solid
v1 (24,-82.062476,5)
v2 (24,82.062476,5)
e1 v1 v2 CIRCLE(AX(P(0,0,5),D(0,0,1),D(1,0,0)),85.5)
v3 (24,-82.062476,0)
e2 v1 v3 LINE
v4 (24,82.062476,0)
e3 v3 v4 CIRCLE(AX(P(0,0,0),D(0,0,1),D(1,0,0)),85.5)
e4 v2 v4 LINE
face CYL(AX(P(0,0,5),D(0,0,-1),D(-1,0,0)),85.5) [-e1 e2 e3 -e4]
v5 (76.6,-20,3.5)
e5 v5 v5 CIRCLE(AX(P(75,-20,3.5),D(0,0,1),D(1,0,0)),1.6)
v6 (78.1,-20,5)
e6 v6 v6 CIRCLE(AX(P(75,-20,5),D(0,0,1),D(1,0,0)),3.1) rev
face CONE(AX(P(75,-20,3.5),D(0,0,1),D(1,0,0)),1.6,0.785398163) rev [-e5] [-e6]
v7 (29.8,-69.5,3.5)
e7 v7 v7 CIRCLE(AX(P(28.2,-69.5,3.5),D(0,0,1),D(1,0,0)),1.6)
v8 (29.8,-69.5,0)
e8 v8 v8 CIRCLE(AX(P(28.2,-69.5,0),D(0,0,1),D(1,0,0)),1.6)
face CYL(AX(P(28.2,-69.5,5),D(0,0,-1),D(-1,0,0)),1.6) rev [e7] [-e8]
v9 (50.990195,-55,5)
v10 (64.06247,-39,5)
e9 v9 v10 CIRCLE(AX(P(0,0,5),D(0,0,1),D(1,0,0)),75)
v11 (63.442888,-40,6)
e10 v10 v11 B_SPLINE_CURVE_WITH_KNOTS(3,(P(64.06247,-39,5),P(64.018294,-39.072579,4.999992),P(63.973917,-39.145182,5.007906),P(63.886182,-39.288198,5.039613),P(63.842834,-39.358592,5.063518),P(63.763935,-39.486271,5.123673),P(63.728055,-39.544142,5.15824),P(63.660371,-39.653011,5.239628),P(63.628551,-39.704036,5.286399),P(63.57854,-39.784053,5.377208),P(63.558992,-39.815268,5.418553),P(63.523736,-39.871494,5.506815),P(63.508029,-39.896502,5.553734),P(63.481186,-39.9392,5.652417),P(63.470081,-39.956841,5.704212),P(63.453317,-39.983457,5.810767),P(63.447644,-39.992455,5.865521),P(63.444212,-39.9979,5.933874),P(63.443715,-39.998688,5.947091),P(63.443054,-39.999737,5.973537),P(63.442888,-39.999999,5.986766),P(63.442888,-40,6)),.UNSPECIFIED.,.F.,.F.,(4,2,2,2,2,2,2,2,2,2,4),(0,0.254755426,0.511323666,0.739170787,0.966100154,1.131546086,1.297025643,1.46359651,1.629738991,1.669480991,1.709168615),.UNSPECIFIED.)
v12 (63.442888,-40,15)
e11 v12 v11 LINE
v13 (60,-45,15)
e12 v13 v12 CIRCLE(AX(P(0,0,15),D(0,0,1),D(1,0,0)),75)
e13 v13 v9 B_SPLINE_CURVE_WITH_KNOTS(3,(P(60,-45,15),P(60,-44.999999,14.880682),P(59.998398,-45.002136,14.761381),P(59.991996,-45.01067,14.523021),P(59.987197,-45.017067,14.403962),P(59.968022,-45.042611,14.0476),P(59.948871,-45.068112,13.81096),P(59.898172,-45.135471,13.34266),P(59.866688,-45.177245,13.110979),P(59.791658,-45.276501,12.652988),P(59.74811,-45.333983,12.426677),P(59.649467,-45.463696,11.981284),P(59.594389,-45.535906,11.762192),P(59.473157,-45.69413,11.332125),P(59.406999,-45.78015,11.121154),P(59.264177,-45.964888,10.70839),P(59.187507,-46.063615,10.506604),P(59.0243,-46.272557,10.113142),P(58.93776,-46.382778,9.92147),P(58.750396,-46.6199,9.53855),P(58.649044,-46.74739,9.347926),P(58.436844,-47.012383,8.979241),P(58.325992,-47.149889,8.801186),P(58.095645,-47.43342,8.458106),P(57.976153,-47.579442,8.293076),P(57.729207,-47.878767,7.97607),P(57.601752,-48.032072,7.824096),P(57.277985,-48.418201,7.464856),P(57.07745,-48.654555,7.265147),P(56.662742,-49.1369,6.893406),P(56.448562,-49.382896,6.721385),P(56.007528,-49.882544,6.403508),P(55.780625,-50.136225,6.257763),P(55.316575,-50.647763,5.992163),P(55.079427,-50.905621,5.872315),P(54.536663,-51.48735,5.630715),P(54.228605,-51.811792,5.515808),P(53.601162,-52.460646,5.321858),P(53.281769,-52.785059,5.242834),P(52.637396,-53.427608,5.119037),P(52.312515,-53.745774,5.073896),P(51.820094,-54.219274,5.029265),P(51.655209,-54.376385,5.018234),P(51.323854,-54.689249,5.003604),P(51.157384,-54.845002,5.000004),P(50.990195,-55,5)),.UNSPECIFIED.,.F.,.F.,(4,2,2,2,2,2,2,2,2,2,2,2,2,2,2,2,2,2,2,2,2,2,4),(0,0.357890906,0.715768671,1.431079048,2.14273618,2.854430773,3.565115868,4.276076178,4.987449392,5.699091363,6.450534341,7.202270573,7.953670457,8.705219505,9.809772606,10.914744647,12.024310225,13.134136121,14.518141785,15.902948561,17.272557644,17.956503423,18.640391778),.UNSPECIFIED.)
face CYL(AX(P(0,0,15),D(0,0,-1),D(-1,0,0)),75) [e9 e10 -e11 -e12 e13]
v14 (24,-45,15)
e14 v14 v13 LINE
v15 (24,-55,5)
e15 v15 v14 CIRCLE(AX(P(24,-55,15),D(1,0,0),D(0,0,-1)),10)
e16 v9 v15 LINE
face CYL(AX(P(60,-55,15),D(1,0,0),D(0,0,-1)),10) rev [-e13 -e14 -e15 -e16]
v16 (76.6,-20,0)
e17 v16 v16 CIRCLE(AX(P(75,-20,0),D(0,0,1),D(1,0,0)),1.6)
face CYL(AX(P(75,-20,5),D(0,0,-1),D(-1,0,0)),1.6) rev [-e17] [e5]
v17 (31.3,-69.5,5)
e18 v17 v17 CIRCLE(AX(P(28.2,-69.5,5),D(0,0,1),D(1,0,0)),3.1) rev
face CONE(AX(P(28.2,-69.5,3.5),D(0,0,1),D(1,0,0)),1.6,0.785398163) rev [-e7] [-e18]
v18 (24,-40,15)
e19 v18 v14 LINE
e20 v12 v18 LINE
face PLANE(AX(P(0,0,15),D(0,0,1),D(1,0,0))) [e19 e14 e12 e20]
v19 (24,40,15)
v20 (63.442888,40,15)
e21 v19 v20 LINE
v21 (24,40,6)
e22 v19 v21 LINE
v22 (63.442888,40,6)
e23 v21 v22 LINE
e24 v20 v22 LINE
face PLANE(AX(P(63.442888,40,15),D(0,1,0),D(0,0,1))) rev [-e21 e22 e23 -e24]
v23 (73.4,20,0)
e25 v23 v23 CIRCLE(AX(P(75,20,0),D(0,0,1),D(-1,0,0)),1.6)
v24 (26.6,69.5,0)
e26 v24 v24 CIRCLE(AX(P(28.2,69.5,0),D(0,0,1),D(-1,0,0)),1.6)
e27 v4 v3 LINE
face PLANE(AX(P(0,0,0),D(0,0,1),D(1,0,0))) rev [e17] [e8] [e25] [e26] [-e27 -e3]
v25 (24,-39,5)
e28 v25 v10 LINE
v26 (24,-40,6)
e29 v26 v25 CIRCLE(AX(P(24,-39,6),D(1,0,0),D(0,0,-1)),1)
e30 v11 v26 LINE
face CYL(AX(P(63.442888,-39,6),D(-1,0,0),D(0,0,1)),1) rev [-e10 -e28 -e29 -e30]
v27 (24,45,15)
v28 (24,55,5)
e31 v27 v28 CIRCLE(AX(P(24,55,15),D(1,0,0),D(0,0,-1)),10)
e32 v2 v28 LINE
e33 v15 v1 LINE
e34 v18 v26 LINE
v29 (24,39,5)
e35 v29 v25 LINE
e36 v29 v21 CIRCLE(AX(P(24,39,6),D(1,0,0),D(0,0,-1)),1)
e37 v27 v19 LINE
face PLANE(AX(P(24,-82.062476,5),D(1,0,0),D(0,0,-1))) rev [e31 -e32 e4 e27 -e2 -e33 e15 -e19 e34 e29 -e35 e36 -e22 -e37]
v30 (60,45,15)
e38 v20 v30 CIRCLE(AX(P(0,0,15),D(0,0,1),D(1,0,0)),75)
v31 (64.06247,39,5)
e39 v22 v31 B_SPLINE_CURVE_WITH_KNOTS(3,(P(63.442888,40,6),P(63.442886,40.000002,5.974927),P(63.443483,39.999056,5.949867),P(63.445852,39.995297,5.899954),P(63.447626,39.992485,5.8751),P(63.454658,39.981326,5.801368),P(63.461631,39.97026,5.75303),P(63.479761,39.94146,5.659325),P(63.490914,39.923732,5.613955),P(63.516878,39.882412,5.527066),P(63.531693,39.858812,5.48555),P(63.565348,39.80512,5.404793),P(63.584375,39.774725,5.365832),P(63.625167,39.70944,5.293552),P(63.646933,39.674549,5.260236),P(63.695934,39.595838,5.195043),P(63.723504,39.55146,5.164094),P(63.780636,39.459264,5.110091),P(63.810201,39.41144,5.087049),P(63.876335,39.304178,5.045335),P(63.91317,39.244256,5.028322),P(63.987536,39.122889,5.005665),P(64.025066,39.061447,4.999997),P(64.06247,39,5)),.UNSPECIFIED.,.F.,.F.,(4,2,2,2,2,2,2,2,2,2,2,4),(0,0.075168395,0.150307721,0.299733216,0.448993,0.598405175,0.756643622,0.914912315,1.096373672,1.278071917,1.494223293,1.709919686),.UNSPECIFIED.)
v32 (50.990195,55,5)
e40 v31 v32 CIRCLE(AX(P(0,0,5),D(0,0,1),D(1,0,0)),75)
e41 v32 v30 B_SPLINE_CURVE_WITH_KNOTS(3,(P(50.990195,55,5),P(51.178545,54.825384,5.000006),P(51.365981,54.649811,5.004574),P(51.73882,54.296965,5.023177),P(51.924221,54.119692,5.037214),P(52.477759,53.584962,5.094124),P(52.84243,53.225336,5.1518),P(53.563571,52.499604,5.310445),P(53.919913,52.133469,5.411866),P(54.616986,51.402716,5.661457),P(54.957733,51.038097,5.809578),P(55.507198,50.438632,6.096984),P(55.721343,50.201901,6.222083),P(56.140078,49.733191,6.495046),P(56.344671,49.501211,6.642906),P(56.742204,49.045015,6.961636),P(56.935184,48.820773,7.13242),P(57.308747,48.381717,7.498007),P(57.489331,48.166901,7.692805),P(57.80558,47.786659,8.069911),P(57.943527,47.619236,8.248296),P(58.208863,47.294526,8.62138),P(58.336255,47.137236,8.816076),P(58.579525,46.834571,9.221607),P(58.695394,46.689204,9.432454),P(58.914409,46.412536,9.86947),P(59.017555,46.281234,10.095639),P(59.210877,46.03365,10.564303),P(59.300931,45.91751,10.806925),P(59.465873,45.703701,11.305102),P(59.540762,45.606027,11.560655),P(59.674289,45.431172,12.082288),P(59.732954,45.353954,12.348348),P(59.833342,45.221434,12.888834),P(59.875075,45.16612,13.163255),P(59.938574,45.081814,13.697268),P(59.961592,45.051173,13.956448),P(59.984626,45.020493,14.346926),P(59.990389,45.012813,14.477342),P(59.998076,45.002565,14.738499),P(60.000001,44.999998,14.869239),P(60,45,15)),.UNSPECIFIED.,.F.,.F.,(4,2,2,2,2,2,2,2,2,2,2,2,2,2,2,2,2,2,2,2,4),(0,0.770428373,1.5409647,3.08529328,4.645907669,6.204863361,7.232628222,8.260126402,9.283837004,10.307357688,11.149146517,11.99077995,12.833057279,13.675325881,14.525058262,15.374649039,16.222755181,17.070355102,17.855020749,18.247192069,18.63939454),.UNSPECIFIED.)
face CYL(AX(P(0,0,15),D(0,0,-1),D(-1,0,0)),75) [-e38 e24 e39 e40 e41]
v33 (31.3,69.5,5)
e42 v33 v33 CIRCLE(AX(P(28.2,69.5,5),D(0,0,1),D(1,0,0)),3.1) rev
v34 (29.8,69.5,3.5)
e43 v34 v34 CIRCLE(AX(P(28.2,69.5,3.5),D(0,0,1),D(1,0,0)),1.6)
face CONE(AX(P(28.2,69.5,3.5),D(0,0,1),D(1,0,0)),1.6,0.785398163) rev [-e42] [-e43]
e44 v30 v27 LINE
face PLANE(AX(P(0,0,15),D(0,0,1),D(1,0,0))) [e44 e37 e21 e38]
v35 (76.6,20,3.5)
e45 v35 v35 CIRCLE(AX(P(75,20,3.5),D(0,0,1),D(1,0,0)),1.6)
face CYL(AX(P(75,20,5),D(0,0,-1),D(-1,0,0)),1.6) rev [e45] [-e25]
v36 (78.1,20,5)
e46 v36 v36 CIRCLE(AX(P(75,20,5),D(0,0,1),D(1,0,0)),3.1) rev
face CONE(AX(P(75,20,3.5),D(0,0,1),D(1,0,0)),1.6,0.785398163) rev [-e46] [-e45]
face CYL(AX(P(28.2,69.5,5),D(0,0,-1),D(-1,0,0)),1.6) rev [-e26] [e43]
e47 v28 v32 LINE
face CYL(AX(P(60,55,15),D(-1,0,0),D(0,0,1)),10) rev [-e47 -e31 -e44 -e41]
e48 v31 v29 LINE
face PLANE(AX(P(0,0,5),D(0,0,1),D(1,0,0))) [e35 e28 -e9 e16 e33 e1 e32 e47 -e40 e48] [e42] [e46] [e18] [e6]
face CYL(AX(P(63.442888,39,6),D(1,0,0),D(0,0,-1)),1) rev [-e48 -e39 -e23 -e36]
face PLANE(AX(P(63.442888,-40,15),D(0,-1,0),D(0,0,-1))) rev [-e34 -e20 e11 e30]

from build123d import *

# Parameters (mm, degrees)
SKETCH1_R           = 1.6
BOSS_EXTRUDE2_DEPTH = 5
BOSS_EXTRUDE3_DEPTH = 10
CHAMFER1_SIZE       = 1.5
FILLET1_R           = 10
FILLET2_R           = 1


with BuildPart() as part:
    # Sketch1 → Boss-Extrude2 (new body)
    with BuildSketch(Plane(origin=(0, 0, 0), x_dir=(0, 1, 0), z_dir=(0, 0, 1))):
        with BuildLine():
            Line((-82.0624762, -24), (82.0624762, -24))
            ThreePointArc((82.0624762, -24), (0, -85.5), (-82.0624762, -24))
        make_face()
        with Locations(Location((-20, -75, 0), (0, 0, 270))):
            Circle(SKETCH1_R, mode=Mode.SUBTRACT)
        with Locations(Location((20, -75, 0), (0, 0, 90))):
            Circle(SKETCH1_R, mode=Mode.SUBTRACT)
        with Locations(Location((-69.5, -28.2, 0), (0, 0, 270))):
            Circle(SKETCH1_R, mode=Mode.SUBTRACT)
        with Locations(Location((69.5, -28.2, 0), (0, 0, 90))):
            Circle(SKETCH1_R, mode=Mode.SUBTRACT)
    extrude(amount=BOSS_EXTRUDE2_DEPTH)

    # Sketch2 → Boss-Extrude3 (add)
    with BuildSketch(Plane.XY.offset(5)):
        with BuildLine():
            Line((60, 45), (24, 45))
            Line((24, 45), (24, 40))
            Line((24, 40), (63.442887702, 40))
            ThreePointArc((63.442887702, 40), (61.772053803, 42.534848876), (60, 45))
        make_face()
        with BuildLine():
            Line((24, -45), (24, -40))
            Line((24, -40), (63.442887702, -40))
            ThreePointArc((63.442887702, -40), (61.772053803, -42.534848876), (60, -45))
            Line((60, -45), (24, -45))
        make_face()
    extrude(amount=BOSS_EXTRUDE3_DEPTH)

    # Chamfer1
    chamfer1_edges = [part.edges().sort_by_distance(p)[0] for p in [
        (76.6, 20, 5),
        (26.6, -69.5, 5),
        (29.8, 69.5, 5),
        (73.4, -20, 5),
    ]]
    chamfer(chamfer1_edges, length=CHAMFER1_SIZE)

    # Fillet1
    fillet1_edges = [part.edges().sort_by_distance(p)[0] for p in [
        (42, -45, 5),
        (42, 45, 5),
    ]]
    fillet(fillet1_edges, radius=FILLET1_R - 0.0001)  # a hair under: the kernel refuses the full size

    # Fillet2
    fillet2_edges = [part.edges().sort_by_distance(p)[0] for p in [
        (43.721443851, 40, 5),
        (43.721443851, -40, 5),
    ]]
    fillet(fillet2_edges, radius=FILLET2_R)


solid = part.part
